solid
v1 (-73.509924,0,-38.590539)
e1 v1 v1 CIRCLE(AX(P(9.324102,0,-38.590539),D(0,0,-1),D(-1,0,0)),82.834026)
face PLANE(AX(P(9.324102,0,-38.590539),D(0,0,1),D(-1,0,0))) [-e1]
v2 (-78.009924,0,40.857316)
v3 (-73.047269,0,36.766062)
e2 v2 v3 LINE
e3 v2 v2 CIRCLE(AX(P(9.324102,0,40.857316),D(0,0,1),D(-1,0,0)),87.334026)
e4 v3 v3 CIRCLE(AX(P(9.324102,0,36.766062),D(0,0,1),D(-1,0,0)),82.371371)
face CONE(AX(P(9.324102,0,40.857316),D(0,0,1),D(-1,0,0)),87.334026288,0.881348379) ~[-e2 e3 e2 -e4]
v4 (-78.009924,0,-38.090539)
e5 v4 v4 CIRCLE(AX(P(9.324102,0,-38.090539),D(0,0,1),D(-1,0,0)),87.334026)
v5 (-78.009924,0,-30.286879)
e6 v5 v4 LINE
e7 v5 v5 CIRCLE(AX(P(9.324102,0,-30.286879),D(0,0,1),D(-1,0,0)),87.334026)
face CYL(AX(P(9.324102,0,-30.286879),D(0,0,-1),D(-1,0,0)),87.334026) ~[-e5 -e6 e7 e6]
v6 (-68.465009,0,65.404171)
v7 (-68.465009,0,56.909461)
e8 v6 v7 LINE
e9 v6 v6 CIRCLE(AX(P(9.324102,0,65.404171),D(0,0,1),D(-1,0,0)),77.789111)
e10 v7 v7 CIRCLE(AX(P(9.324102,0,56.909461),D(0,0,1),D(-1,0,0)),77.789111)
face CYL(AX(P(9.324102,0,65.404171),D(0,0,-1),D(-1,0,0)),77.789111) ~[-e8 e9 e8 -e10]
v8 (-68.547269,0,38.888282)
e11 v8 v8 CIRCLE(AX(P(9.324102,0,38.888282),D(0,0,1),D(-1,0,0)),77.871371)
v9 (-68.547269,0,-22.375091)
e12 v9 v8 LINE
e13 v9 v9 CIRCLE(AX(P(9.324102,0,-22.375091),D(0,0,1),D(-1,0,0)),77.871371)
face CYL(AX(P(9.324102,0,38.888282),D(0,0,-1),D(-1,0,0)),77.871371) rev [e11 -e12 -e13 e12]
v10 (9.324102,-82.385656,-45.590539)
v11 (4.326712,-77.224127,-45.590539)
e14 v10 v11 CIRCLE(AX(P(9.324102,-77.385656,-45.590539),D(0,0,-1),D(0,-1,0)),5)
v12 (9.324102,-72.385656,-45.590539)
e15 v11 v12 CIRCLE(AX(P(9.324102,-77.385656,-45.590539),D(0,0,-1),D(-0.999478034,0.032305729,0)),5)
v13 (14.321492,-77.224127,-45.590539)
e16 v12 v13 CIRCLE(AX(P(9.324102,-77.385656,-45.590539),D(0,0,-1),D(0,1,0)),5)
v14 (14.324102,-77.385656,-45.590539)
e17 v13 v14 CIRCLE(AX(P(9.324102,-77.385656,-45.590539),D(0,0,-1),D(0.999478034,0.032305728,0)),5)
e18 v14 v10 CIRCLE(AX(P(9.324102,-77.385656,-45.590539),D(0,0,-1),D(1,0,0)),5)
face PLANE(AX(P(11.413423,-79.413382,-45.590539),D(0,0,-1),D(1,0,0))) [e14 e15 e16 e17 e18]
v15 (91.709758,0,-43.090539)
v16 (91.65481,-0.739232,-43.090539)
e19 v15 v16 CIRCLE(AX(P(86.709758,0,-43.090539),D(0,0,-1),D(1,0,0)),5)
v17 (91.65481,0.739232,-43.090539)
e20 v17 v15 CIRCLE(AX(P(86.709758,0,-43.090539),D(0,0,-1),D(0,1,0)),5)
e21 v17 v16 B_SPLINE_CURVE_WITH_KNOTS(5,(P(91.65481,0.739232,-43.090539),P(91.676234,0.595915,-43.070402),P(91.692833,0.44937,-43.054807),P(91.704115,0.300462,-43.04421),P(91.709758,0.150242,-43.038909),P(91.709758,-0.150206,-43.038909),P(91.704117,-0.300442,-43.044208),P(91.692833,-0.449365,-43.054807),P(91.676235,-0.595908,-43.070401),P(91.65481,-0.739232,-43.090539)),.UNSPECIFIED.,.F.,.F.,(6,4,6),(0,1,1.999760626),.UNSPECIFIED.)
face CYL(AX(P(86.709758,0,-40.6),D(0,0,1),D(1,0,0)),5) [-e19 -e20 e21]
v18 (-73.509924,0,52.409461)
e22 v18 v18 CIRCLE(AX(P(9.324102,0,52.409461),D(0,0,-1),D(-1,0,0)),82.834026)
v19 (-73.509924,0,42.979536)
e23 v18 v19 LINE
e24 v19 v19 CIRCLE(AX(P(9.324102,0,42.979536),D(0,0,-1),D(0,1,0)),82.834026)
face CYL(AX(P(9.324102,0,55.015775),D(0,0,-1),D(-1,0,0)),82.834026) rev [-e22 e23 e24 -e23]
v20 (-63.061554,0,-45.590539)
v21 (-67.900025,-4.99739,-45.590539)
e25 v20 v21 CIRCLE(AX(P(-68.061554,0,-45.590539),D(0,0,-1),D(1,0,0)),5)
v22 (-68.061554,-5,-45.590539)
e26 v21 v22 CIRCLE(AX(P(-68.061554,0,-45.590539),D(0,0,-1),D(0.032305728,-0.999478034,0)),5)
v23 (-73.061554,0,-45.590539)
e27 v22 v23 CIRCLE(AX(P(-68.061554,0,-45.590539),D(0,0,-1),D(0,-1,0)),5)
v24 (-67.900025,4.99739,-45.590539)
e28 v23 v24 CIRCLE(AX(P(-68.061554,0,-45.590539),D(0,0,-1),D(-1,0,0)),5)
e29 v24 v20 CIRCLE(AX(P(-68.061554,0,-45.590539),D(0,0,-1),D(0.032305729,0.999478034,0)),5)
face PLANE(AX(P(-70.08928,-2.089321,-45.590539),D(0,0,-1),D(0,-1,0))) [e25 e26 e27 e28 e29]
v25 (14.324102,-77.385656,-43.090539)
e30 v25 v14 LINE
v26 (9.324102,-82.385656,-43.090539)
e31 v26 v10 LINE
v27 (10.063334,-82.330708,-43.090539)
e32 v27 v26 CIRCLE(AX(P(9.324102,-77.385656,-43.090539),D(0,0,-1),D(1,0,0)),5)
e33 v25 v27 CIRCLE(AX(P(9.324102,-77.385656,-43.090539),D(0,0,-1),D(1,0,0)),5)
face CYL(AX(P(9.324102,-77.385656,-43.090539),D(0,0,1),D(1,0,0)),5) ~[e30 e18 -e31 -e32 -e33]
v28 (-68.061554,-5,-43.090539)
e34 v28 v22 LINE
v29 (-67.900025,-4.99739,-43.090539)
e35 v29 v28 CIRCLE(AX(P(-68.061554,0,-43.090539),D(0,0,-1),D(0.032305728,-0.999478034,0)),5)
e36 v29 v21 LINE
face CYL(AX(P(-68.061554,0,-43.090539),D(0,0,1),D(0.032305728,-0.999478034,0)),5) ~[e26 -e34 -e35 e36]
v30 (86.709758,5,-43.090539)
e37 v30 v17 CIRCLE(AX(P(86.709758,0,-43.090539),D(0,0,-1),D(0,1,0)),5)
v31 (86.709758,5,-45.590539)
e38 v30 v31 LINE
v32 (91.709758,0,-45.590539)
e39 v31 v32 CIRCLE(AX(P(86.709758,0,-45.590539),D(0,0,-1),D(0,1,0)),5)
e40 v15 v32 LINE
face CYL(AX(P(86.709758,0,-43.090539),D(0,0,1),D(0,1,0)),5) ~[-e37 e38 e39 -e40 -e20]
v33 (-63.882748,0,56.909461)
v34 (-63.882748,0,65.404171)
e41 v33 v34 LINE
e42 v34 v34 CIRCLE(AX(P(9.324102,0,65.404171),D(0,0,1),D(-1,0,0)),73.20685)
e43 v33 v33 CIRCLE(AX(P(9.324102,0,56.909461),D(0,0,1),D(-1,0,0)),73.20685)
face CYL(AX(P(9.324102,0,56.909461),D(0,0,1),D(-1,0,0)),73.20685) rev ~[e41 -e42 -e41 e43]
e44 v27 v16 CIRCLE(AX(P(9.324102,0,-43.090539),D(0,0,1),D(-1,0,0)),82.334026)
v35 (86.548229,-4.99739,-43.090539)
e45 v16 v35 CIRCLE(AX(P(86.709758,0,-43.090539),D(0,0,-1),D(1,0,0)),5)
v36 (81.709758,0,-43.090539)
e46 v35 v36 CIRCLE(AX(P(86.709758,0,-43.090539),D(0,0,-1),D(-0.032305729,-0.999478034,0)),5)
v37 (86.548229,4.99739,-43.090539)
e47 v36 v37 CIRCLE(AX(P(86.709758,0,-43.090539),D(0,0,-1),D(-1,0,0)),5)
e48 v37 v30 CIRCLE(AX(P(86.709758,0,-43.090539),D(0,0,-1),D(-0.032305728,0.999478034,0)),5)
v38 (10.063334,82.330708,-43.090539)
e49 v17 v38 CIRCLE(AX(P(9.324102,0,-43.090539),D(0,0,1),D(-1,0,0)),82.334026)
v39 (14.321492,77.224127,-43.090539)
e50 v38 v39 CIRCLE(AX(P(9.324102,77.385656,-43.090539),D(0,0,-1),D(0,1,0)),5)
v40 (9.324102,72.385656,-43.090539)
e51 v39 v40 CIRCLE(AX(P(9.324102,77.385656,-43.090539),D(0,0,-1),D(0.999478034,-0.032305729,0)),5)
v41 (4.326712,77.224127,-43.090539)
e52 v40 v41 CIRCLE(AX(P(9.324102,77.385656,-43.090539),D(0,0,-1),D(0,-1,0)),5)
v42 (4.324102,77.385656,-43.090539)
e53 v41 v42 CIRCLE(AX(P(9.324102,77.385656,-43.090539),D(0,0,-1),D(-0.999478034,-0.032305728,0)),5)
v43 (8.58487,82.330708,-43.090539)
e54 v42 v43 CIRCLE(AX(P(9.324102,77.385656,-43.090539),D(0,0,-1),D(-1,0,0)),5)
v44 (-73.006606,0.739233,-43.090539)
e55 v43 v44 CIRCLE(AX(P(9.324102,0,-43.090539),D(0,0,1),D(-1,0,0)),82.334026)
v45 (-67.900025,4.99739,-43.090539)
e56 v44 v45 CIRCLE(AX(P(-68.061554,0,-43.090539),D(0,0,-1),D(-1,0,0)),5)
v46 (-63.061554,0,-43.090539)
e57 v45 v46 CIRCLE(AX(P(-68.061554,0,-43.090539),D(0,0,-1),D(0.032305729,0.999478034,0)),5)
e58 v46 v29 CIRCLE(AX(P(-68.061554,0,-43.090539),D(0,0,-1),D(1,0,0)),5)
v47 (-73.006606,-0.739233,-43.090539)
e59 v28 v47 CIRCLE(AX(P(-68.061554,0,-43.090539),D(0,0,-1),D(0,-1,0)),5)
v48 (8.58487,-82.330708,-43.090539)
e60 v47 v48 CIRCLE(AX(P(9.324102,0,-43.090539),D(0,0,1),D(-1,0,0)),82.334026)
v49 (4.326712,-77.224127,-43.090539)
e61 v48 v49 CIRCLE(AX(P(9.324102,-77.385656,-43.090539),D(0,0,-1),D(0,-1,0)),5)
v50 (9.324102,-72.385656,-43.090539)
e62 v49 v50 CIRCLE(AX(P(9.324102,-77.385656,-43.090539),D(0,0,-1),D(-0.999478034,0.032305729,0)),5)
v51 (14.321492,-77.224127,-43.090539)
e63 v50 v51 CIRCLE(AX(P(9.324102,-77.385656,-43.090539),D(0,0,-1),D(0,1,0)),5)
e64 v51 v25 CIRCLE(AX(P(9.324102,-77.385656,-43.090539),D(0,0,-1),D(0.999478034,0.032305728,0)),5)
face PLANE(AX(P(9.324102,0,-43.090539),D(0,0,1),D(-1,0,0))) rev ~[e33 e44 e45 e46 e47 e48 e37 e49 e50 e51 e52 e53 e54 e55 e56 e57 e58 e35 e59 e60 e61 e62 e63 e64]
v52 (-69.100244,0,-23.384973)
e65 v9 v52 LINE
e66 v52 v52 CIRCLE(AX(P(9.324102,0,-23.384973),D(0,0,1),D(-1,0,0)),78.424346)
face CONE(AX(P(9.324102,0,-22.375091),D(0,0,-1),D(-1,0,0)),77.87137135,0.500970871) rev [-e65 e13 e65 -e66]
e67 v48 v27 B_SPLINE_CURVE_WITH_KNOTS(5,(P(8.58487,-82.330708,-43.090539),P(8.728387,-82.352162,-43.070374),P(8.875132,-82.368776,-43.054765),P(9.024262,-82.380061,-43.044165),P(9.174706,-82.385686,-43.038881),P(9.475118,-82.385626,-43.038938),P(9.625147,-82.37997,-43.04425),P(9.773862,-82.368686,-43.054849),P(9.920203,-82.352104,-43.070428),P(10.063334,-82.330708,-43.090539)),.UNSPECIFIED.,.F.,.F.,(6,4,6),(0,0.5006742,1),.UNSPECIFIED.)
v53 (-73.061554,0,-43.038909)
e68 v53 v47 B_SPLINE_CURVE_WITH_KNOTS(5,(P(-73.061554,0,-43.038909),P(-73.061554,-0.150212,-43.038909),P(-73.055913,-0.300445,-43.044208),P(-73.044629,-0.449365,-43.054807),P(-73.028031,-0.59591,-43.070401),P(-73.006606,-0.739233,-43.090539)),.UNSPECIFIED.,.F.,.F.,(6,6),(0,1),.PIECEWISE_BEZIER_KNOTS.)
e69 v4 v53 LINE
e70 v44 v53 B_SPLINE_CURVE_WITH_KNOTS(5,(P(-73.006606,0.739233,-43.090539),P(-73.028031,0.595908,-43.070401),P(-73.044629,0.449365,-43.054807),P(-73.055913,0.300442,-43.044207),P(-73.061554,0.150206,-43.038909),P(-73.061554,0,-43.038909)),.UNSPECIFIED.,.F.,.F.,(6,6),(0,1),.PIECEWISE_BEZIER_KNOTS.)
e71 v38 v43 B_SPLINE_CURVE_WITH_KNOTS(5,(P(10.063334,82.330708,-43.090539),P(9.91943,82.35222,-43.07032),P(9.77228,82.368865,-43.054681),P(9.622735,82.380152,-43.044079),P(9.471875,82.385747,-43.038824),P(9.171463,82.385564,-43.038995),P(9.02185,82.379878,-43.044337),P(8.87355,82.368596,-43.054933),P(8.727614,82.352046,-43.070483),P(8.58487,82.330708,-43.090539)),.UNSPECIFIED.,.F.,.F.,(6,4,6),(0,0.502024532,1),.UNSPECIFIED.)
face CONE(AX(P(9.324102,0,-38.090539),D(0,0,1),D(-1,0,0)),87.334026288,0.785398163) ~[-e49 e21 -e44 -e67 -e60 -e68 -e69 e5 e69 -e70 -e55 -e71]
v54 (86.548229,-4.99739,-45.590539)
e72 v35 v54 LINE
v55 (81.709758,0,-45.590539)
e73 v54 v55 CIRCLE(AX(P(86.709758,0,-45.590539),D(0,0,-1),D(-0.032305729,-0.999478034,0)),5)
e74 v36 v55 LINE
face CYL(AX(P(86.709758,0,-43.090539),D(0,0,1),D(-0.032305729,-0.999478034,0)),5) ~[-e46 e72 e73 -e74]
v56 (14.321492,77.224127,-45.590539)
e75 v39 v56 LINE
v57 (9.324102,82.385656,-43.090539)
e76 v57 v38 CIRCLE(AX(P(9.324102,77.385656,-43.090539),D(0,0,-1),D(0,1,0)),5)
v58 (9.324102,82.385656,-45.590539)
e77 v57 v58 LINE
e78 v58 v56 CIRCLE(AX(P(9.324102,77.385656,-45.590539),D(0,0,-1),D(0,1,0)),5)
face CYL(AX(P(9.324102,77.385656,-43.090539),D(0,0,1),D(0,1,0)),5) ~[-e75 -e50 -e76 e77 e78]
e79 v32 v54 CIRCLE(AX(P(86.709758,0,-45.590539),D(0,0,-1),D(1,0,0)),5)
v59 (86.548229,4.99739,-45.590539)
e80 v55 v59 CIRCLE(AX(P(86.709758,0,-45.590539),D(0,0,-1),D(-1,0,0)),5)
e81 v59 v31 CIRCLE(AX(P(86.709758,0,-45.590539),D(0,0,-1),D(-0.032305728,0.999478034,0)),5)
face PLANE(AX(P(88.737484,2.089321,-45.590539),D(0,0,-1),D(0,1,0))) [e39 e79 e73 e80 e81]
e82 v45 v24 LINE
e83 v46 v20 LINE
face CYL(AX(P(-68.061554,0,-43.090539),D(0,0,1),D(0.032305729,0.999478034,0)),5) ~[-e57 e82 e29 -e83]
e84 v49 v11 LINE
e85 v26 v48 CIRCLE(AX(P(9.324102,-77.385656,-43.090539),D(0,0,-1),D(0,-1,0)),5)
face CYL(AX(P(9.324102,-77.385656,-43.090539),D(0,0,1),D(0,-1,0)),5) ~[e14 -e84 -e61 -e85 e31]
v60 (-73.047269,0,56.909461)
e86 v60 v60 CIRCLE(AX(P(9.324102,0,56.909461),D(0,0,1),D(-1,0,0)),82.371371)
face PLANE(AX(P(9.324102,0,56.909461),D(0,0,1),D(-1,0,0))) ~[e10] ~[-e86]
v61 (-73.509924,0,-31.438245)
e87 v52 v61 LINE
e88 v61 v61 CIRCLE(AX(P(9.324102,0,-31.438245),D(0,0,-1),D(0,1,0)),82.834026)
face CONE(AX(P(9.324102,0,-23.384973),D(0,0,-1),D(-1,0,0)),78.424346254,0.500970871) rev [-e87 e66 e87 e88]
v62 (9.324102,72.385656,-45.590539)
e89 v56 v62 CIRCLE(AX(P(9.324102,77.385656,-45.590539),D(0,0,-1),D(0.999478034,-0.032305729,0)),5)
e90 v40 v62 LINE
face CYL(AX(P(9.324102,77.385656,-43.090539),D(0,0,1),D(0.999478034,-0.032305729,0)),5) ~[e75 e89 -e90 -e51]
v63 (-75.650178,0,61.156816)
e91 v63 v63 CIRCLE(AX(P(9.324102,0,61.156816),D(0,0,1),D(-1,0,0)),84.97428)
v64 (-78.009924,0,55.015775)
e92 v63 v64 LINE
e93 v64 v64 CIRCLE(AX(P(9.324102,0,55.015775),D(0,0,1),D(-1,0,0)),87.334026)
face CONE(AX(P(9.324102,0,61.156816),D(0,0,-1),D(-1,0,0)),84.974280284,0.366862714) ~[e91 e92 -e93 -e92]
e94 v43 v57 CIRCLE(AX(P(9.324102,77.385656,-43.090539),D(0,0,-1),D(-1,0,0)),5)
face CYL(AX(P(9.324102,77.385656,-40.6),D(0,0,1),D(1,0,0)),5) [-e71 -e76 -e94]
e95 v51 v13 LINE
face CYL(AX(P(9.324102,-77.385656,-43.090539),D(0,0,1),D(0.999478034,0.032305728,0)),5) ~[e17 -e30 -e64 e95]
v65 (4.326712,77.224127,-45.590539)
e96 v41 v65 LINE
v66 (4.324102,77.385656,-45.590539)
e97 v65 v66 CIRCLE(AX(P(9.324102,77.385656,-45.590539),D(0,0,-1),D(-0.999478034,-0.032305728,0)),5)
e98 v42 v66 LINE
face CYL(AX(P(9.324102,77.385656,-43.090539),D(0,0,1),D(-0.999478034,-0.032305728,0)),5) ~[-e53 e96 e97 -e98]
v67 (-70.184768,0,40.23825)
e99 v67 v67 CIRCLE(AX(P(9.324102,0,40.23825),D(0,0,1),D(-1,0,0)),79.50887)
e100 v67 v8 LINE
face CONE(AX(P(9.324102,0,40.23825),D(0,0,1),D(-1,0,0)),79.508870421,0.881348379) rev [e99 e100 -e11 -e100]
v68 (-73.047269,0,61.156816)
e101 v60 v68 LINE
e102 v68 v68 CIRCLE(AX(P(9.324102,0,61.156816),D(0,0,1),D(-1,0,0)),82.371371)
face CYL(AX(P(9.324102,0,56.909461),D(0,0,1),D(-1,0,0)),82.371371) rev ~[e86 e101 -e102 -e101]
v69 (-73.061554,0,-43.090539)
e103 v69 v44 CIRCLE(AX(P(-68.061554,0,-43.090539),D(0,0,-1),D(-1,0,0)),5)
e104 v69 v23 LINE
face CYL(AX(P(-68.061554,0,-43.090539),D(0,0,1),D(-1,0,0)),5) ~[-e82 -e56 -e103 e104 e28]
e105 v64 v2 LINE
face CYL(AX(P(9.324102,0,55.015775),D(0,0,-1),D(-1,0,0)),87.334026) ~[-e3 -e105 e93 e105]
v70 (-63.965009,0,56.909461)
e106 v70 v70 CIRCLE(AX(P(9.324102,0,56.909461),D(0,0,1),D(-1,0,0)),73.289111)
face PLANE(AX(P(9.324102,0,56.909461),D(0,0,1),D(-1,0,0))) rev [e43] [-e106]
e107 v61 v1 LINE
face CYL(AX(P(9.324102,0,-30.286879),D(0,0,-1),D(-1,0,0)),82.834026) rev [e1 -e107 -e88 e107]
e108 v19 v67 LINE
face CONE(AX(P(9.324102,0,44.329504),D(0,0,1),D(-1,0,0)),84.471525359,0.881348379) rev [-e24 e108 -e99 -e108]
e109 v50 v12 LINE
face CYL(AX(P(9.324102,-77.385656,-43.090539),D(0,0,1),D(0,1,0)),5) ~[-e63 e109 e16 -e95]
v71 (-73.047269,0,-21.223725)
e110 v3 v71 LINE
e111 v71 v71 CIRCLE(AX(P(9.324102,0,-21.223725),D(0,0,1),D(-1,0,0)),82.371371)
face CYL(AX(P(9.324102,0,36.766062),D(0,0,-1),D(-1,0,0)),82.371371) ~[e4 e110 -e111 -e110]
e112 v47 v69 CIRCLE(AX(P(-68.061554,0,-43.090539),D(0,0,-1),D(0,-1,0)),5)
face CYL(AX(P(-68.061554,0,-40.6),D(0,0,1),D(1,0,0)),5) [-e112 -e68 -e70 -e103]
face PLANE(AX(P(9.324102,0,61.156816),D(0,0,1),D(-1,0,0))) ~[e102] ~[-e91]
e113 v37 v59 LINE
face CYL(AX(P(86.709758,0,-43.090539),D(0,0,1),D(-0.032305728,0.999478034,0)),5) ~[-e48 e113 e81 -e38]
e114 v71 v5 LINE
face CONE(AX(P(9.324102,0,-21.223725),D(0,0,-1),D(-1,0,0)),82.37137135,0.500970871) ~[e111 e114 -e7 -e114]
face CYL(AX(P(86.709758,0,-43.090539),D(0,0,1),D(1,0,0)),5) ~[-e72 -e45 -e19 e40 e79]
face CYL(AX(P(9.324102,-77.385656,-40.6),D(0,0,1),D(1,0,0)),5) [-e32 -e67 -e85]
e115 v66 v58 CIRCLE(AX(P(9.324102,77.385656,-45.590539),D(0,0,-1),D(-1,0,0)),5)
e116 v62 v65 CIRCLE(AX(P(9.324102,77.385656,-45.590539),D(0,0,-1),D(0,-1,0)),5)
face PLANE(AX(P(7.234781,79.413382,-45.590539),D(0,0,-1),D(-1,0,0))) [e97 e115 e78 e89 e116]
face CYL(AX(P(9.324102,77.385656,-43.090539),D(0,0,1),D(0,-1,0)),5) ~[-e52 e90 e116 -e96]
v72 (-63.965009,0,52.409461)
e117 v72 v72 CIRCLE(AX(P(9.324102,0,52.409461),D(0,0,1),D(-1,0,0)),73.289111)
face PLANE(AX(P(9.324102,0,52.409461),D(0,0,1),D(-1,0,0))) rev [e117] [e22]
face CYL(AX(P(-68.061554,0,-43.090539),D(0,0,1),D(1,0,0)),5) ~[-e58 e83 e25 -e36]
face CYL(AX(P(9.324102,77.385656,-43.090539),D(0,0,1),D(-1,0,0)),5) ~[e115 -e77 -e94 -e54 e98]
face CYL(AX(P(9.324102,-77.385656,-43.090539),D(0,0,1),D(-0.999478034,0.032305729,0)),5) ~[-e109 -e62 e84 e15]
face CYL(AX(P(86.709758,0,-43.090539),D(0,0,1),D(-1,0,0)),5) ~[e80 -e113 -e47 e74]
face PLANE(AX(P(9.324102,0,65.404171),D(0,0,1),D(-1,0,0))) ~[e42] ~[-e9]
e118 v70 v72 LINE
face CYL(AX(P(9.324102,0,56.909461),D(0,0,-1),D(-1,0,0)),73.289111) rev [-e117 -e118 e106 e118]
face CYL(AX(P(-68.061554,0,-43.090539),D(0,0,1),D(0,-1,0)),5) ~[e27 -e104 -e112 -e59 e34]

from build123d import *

# Parameters (mm, degrees)
F2_T            = 4.5
F4_DEPTH        = 2.5
F4_COPIES_COUNT = 4
F5_S5_R         = 5
F5_T6_DEPTH     = 125
F5_S7_R         = 5
F5_T8_DEPTH     = 125
F5_S9_R         = 5
F5_T10_DEPTH    = 125
F5_S11_R        = 5
F5_T12_DEPTH    = 125


# Not quite as in the source:
# - a fillet or chamfer that OpenCascade refuses, or shapes differently, is made with other operations: its cross-section is extruded or revolved along the edge and cut away or added
# - a pattern or mirror of a feature is missing from the dataset's text; its kind, count and spacing are read off the source's solid
# - a shell that OpenCascade refuses in one call is made with other operations: the cavity is built on its own and cut out


with BuildPart() as f1:
    # F0 (on Front) → F1 (revolve)
    with BuildSketch(Plane.XZ):
        Polygon((9.3241020494, -43.0905388618), (9.3241020494, 56.9094611382), (-63.8827484445, 56.9094611382), (-63.8827484445, 65.4041709328), (-68.4650088725, 65.4041709328), (-68.4650088725, 56.9094611382), (-73.0472693004, 56.9094611382), (-73.0472693004, 61.1568160355), (-75.6501782344, 61.1568160355), (-78.0099242383, 55.0157746972), (-78.0099242383, 40.8573164567), (-73.0472693004, 36.7660618934), (-73.0472693004, -21.2237248131), (-78.0099242383, -30.2868788943), (-78.0099242383, -43.0905388618), align=None)
    revolve(axis=Axis((9.3241020494, 0, 6.9094611382), (0, 0, 1)))

    # F2: shell of thickness 4.5, made by hand


with BuildPart() as f2_core1:
    # F2_t2: copy of F1
    add(f1.part)

    # the walls: a layer under each face that stays
    f2_faces = [f2_core1.faces().sort_by_distance(p)[0] for p in [
        (82.5309525433, 0, 61.1568160355),
        (-42.5353052318, 51.8594072813, 65.4041709328),
        (87.1132129713, 0, 61.1568160355),
        (-67.5558445438, 21.9656990266, 56.9094611382),
        (91.6954733993, 0, 59.0331385869),
        (-69.9852262155, 22.6598080757, 61.1568160355),
        (95.4782553352, 0, 58.0862953663),
        (96.6581283371, 0, 47.936545577),
        (94.1768008682, 0, 38.8116891751),
        (91.6954733993, 0, 7.7711685402),
        (94.1768008682, 0, -25.7553018537),
        (96.6581283371, 0, -36.688708878),
        (9.3241020494, 0, -43.0905388618),
    ]]
    thicken(f2_faces, amount=-F2_T, mode=Mode.SUBTRACT)

    # F2_s3 → F2_t4 (revolve, cut)
    with BuildSketch(Plane.XZ):
        Polygon((-68.5100088725, 56.9544611382), (-63.9650088725, 56.9094611382), (-63.9650088725, 52.4094611382), (-68.4650088725, 52.4094611382), align=None)
    revolve(axis=Axis((9.3241020494, 0, 56.9094611382), (0, 0, 1)), mode=Mode.SUBTRACT)

    # F2_s5 → F2_t6 (revolve, cut)
    with BuildSketch(Plane.XZ):
        Polygon((-73.0022693004, 56.9544611382), (-73.0472693004, 52.4094611382), (-77.5472693004, 52.4094611382), (-77.5472693004, 56.9094611382), align=None)
    revolve(axis=Axis((9.3241020494, 0, 56.9094611382), (0, 0, 1)), mode=Mode.SUBTRACT)

    # F2_s7 → F2_t8 (revolve, cut)
    with BuildSketch(Plane.XZ):
        Polygon((-73.1208943097, 36.731340015), (-70.1847683719, 40.2382497389), (-68.5472693004, 38.8882817011), (-68.5472693004, 36.7660618934), align=None)
    revolve(axis=Axis((9.3241020494, 0, 36.7660618934), (0, 0, 1)), mode=Mode.SUBTRACT)

    # F2_s9 → F2_t10 (revolve, cut)
    with BuildSketch(Plane.XZ):
        Polygon((-73.1317395514, -21.2021123331), (-68.5472693004, -21.2237248131), (-68.5472693004, -22.375090633), (-69.1002442047, -23.3849728075), align=None)
    revolve(axis=Axis((9.3241020494, 0, -21.2237248131), (0, 0, 1)), mode=Mode.SUBTRACT)


with BuildPart() as f1_1:
    add(f1.part)

    # what is left inside the walls is the cavity
    f2_cavity = [f2_core1.part.solids().sort_by_distance(p)[0] for p in [
        (87.150473, 0, 18.467158),
    ]]
    add(f2_cavity, mode=Mode.SUBTRACT)

    # F3 (on face) → F4 (join)
    with BuildSketch(Plane(origin=(0, 0, -43.0905388618), x_dir=(1, 0, 0), z_dir=(0, 0, -1))):
        with BuildLine():
            ThreePointArc((9.3241020494, 77.3856560126), (11.8241020494, 77.3452633101), (14.3214922181, 77.2241273697))
            ThreePointArc((14.3214922181, 77.2241273697), (14.323449549, 77.30488115), (14.3241020494, 77.3856560126))
            ThreePointArc((14.3241020494, 77.3856560126), (12.8596359554, 80.9211899185), (9.3241020494, 82.3856560126))
            Line((9.3241020494, 82.3856560126), (9.3241020494, 77.3856560126))
        make_face()
        with BuildLine():
            Line((9.3241020494, 77.3856560126), (9.3241020494, 72.3856560126))
            ThreePointArc((9.3241020494, 72.3856560126), (12.8020581148, 73.7934670411), (14.3214922181, 77.2241273697))
            ThreePointArc((14.3214922181, 77.2241273697), (11.8241020494, 77.3452633101), (9.3241020494, 77.3856560126))
        make_face()
        with BuildLine():
            ThreePointArc((4.3267118808, 77.2241273697), (5.8461459841, 73.7934670411), (9.3241020494, 72.3856560126))
            Line((9.3241020494, 72.3856560126), (9.3241020494, 77.3856560126))
            ThreePointArc((9.3241020494, 77.3856560126), (6.8241020494, 77.3452633101), (4.3267118808, 77.2241273697))
        make_face()
        with BuildLine():
            ThreePointArc((9.3241020494, 82.3856560126), (5.7319130779, 80.863612078), (4.3267118808, 77.2241273697))
            ThreePointArc((4.3267118808, 77.2241273697), (6.8241020494, 77.3452633101), (9.3241020494, 77.3856560126))
            Line((9.3241020494, 77.3856560126), (9.3241020494, 82.3856560126))
        make_face()
    f4 = extrude(amount=F4_DEPTH)

    # F4_copies: F4 ×4 about axis
    f4_copies_axis = Axis((9.324102, 0, 0), (0, 0, 1))
    for i in range(1, F4_COPIES_COUNT):
        add(f4.rotate(f4_copies_axis, i * 360 / F4_COPIES_COUNT))

    # F5: chamfer of 5 on 1 edges, made by hand


with BuildPart() as f5_tool2:
    # F5_s3 → F5_t4 (revolve)
    with BuildSketch(Plane.XZ):
        Polygon((-78.0099242383, -38.0905388618), (-73.0099242383, -43.0905388618), (-78.0099242383, -43.0905388618), align=None)
    revolve(axis=Axis((9.3241020494, 0, -43.0905388618), (0, 0, 1)))

    # F5_s5 → F5_t6 (cut, symmetric)
    with BuildSketch(Plane.XY.offset(-40.6)):
        with Locations((86.7097580126, 4.94e-08)):
            Circle(F5_S5_R)
    extrude(amount=F5_T6_DEPTH, both=True, mode=Mode.SUBTRACT)

    # F5_s7 → F5_t8 (cut, symmetric)
    with BuildSketch(Plane.XY.offset(-40.6)):
        with Locations((9.3241019506, 77.3856560126)):
            Circle(F5_S7_R)
    extrude(amount=F5_T8_DEPTH, both=True, mode=Mode.SUBTRACT)

    # F5_s9 → F5_t10 (cut, symmetric)
    with BuildSketch(Plane.XY.offset(-40.6)):
        with Locations((9.3241020494, -77.3856560126)):
            Circle(F5_S9_R)
    extrude(amount=F5_T10_DEPTH, both=True, mode=Mode.SUBTRACT)

    # F5_s11 → F5_t12 (cut, symmetric)
    with BuildSketch(Plane.XY.offset(-40.6)):
        with Locations((-68.0615540126, -4.94e-08)):
            Circle(F5_S11_R)
    extrude(amount=F5_T12_DEPTH, both=True, mode=Mode.SUBTRACT)


with BuildPart() as f1_2:
    add(f1_1.part)

    # F5_t1: cut F5_tool2
    add(f5_tool2.part, mode=Mode.SUBTRACT)


solid = f1_2.part
